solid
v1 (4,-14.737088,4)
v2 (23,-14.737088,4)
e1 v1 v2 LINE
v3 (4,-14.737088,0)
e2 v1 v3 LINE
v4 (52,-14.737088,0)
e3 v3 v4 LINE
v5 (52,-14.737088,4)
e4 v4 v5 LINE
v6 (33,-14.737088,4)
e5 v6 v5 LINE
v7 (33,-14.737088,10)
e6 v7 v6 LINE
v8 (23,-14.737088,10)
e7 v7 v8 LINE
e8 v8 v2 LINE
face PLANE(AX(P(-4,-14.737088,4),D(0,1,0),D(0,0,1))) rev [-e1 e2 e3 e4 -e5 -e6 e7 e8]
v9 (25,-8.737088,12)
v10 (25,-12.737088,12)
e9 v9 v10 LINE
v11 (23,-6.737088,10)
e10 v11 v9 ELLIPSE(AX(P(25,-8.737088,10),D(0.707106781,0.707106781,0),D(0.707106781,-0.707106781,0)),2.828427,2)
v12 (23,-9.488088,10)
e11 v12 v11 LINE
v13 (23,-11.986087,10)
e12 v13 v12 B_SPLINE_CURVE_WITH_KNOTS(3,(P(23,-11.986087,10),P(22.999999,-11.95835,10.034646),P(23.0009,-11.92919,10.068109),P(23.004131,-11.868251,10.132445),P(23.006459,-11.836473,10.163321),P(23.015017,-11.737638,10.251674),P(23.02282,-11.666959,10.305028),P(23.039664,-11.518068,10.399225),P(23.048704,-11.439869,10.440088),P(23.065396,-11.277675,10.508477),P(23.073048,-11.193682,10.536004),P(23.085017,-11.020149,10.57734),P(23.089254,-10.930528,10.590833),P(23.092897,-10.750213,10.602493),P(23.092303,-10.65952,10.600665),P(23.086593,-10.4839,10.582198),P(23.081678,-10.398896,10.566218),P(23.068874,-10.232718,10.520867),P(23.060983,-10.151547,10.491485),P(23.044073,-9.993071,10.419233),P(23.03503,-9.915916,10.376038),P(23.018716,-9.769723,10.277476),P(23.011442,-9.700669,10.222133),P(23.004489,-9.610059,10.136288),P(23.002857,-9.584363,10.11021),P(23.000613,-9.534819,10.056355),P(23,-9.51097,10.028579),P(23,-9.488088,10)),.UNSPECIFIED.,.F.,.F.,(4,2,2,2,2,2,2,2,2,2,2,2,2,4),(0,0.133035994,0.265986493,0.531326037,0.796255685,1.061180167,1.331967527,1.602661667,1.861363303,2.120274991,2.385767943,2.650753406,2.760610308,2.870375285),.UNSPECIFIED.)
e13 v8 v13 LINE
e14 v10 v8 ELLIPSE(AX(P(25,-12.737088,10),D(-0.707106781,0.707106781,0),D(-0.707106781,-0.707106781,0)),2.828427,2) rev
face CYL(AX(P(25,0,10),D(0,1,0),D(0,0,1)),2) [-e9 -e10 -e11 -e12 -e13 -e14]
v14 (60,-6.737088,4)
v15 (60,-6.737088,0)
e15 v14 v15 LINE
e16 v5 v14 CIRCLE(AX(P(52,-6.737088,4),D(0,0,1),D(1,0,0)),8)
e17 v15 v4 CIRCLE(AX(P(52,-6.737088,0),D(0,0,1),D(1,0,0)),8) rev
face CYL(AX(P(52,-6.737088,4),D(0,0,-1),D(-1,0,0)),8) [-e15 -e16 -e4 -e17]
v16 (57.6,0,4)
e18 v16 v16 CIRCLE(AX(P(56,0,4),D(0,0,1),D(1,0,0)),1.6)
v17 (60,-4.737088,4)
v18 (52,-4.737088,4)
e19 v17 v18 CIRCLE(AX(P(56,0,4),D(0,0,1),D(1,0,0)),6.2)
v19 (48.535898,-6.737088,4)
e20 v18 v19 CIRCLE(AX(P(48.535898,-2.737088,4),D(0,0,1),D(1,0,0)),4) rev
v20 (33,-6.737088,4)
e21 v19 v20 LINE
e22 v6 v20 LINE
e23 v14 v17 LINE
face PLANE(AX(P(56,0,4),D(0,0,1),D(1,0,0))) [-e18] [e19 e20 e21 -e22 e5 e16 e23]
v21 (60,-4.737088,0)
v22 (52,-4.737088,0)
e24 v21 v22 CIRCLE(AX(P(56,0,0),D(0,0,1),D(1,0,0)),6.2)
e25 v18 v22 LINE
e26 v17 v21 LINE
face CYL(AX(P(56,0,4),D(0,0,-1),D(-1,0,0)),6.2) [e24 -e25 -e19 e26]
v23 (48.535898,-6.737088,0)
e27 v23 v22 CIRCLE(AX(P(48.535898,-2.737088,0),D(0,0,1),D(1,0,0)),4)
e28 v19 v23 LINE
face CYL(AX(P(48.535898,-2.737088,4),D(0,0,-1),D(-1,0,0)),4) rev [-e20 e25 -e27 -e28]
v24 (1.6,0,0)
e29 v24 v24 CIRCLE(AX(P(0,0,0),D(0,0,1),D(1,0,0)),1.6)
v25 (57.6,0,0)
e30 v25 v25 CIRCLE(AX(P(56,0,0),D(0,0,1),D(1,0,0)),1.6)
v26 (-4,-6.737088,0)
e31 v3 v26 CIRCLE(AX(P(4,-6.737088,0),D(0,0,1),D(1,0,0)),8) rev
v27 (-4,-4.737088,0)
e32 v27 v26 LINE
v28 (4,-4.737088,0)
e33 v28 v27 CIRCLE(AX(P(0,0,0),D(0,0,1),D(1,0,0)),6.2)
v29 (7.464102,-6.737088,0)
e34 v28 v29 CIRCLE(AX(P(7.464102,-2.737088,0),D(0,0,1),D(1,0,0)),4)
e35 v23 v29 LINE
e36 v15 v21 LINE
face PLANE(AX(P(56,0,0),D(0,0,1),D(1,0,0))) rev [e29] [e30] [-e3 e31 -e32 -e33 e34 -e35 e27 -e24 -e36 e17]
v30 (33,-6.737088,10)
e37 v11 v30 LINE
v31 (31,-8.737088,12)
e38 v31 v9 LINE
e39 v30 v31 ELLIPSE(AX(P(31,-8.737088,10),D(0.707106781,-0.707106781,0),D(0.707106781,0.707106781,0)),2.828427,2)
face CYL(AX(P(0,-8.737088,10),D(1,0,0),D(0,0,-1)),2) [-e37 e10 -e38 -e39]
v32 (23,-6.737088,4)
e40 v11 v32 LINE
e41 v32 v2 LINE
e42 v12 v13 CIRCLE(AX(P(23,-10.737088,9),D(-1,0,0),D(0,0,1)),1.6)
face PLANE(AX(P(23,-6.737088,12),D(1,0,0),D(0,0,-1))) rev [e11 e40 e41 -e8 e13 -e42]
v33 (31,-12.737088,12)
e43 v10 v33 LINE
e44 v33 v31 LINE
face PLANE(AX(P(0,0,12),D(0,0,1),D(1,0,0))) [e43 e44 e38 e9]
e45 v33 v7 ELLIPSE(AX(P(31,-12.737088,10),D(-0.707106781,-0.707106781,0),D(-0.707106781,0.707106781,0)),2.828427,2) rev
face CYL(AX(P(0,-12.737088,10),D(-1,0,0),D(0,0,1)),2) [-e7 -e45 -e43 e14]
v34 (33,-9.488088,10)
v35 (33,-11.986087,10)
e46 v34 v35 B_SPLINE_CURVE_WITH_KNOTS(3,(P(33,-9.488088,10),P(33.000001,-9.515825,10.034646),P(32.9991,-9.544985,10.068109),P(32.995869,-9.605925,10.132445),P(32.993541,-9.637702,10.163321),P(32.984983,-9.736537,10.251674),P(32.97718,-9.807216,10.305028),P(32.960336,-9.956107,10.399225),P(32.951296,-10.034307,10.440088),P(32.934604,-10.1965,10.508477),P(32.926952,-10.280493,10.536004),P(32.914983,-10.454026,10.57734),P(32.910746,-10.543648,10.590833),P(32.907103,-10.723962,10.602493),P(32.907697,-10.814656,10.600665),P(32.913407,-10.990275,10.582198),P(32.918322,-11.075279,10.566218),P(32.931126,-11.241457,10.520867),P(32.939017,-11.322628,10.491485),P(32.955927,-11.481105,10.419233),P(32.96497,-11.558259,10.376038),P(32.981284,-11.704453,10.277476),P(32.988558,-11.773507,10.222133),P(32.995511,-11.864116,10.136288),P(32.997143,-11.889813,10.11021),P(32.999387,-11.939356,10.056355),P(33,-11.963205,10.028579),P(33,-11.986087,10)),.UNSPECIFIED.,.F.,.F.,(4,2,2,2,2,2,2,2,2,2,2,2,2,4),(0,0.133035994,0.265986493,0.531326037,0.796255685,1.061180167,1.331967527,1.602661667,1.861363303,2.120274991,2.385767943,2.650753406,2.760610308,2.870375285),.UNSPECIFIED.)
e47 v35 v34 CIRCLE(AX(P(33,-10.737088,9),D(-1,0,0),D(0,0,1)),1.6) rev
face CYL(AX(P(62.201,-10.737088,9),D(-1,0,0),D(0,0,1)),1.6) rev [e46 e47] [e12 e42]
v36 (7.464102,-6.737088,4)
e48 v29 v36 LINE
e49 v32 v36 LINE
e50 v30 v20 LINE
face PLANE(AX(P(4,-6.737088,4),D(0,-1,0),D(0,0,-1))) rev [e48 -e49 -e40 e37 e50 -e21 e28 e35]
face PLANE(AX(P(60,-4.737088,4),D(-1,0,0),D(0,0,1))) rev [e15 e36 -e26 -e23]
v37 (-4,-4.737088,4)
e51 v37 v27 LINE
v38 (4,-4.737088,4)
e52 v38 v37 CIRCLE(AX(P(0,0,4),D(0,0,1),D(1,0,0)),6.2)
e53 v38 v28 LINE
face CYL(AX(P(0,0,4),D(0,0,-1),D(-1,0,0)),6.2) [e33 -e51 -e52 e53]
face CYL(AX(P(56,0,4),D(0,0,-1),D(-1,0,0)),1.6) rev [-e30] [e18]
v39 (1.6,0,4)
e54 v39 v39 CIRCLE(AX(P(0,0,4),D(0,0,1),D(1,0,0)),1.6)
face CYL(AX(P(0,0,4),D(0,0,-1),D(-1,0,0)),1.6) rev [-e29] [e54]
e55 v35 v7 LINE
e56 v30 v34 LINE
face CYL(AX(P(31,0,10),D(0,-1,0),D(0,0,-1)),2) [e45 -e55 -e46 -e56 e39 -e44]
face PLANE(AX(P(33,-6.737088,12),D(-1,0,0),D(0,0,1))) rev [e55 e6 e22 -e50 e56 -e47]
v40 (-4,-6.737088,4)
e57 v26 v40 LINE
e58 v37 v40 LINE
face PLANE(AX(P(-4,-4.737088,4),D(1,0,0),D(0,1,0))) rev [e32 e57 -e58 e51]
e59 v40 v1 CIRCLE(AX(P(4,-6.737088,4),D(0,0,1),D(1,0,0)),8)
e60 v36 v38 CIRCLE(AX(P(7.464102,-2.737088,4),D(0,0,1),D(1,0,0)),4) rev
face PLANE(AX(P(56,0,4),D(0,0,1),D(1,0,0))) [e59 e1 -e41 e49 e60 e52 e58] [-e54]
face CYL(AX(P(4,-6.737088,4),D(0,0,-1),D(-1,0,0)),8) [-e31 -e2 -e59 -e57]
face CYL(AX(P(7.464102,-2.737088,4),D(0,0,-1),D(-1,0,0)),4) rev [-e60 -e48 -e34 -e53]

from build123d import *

# Parameters (mm, degrees)
CROQUIS1_R              = 1.6
SALIENTE_EXTRUIR1_DEPTH = 4
CROQUIS2_W              = 10
CROQUIS2_H              = 8
SALIENTE_EXTRUIR2_DEPTH = 8
CORTAR_EXTRUIR1_REACH   = 45.564
CROQUIS3_R              = 1.6
REDONDEO1_R             = 2
REDONDEO2_R             = 8
REDONDEO3_R             = 4


with BuildPart() as part:
    # Croquis1 → Saliente-Extruir1 (new body)
    with BuildSketch(Plane.XY):
        with BuildLine():
            Line((-4, -4.737087713), (-4, -14.737087713))
            Line((-4, -14.737087713), (60, -14.737087713))
            Line((60, -14.737087713), (60, -4.737087713))
            ThreePointArc((60, -4.737087713), (56, 6.2), (52, -4.737087713))
            Line((52, -4.737087713), (52, -6.737087713))
            Line((52, -6.737087713), (4, -6.737087713))
            Line((4, -6.737087713), (4, -4.737087713))
            ThreePointArc((4, -4.737087713), (0, 6.2), (-4, -4.737087713))
        make_face()
        Circle(CROQUIS1_R, mode=Mode.SUBTRACT)
        with Locations((56, 0)):
            Circle(CROQUIS1_R, mode=Mode.SUBTRACT)
    extrude(amount=SALIENTE_EXTRUIR1_DEPTH)

    # Croquis2 → Saliente-Extruir2 (add)
    with BuildSketch(Plane.XY.offset(4)):
        with Locations((28, -10.737087713)):
            Rectangle(CROQUIS2_W, CROQUIS2_H)
    extrude(amount=SALIENTE_EXTRUIR2_DEPTH)

    # Croquis3 → Cortar-Extruir1 (cut, up to next)
    with BuildSketch(Plane.ZY.offset(-23), mode=Mode.PRIVATE) as cortar_extruir1_sk1:
        with Locations((9, -10.737087713)):
            Circle(CROQUIS3_R)
    cortar_extruir1_tool1 = extrude(cortar_extruir1_sk1.sketch, amount=-CORTAR_EXTRUIR1_REACH, mode=Mode.PRIVATE) & part.part
    add(cortar_extruir1_tool1.solids().sort_by_distance((23, -10.737088, 9))[0], mode=Mode.SUBTRACT)

    # Redondeo1
    # the kernel refuses this fillet: 2 mm, written as the material it takes off along each edge
    with BuildSketch(Plane(origin=(33, -1.737087713, 12), x_dir=(-1, 0, 0), z_dir=(0, -1, 0))) as redondeo1_piece_1:
        with BuildLine():
            CenterArc((REDONDEO1_R, REDONDEO1_R), REDONDEO1_R, 180, 90)
            Line((0, REDONDEO1_R), (0, 0))
            Line((0, 0), (REDONDEO1_R, 0))
        make_face()
    extrude(amount=18, mode=Mode.SUBTRACT)
    with BuildSketch(Plane(origin=(23, -19.737087713, 12), x_dir=(0, 0, -1), z_dir=(0, 1, 0))) as redondeo1_piece_2:
        with BuildLine():
            CenterArc((REDONDEO1_R, -REDONDEO1_R), REDONDEO1_R, 90, 90)
            Line((0, -REDONDEO1_R), (0, 0))
            Line((0, 0), (REDONDEO1_R, 0))
        make_face()
    extrude(amount=18, mode=Mode.SUBTRACT)
    with BuildSketch(Plane(origin=(18, -6.737087713, 12), x_dir=(0, -1, 0), z_dir=(1, 0, 0))) as redondeo1_piece_3:
        with BuildLine():
            CenterArc((REDONDEO1_R, REDONDEO1_R), REDONDEO1_R, 180, 90)
            Line((0, REDONDEO1_R), (0, 0))
            Line((0, 0), (REDONDEO1_R, 0))
        make_face()
    extrude(amount=20, mode=Mode.SUBTRACT)
    with BuildSketch(Plane(origin=(38, -14.737087713, 12), x_dir=(0, 0, -1), z_dir=(-1, 0, 0))) as redondeo1_piece_4:
        with BuildLine():
            CenterArc((REDONDEO1_R, -REDONDEO1_R), REDONDEO1_R, 90, 90)
            Line((0, -REDONDEO1_R), (0, 0))
            Line((0, 0), (REDONDEO1_R, 0))
        make_face()
    extrude(amount=20, mode=Mode.SUBTRACT)

    # Redondeo2
    redondeo2_edges = [part.edges().sort_by_distance(p)[0] for p in [
        (60, -14.737087713, 2),
        (-4, -14.737087713, 2),
    ]]
    fillet(redondeo2_edges, radius=REDONDEO2_R)

    # Redondeo3
    # the kernel refuses this fillet: 4 mm, written as the material it adds along each edge
    with BuildSketch(Plane(origin=(52, -6.737087713, 0), x_dir=(-1, 0, 0), z_dir=(0, 0, 1))) as redondeo3_piece_1:
        with BuildLine():
            CenterArc((3.464101615, -4), REDONDEO3_R, 90, 60)
            Line((0, -2), (-0.069282032, -1.96))
            ThreePointArc((-0.069282032, -1.96), (-0.08, -1), (-0.08, 0))
            Line((-0.08, 0), (0, 0.08))
            Line((0, 0.08), (3.464101615, 0.08))
            Line((3.464101615, 0.08), (3.464101615, 0))
        make_face()
    extrude(amount=4)
    with BuildSketch(Plane(origin=(4, -6.737087713, 0), x_dir=(0, 1, 0), z_dir=(0, 0, 1))) as redondeo3_piece_2:
        with BuildLine():
            CenterArc((4, -3.464101615), REDONDEO3_R, 120, 60)
            Line((0, -3.464101615), (-0.08, -3.464101615))
            Line((-0.08, -3.464101615), (-0.08, 0))
            Line((-0.08, 0), (0, 0.08))
            ThreePointArc((0, 0.08), (1, 0.08), (1.96, 0.069282032))
            Line((1.96, 0.069282032), (2, 0))
        make_face()
    extrude(amount=4)


solid = part.part
